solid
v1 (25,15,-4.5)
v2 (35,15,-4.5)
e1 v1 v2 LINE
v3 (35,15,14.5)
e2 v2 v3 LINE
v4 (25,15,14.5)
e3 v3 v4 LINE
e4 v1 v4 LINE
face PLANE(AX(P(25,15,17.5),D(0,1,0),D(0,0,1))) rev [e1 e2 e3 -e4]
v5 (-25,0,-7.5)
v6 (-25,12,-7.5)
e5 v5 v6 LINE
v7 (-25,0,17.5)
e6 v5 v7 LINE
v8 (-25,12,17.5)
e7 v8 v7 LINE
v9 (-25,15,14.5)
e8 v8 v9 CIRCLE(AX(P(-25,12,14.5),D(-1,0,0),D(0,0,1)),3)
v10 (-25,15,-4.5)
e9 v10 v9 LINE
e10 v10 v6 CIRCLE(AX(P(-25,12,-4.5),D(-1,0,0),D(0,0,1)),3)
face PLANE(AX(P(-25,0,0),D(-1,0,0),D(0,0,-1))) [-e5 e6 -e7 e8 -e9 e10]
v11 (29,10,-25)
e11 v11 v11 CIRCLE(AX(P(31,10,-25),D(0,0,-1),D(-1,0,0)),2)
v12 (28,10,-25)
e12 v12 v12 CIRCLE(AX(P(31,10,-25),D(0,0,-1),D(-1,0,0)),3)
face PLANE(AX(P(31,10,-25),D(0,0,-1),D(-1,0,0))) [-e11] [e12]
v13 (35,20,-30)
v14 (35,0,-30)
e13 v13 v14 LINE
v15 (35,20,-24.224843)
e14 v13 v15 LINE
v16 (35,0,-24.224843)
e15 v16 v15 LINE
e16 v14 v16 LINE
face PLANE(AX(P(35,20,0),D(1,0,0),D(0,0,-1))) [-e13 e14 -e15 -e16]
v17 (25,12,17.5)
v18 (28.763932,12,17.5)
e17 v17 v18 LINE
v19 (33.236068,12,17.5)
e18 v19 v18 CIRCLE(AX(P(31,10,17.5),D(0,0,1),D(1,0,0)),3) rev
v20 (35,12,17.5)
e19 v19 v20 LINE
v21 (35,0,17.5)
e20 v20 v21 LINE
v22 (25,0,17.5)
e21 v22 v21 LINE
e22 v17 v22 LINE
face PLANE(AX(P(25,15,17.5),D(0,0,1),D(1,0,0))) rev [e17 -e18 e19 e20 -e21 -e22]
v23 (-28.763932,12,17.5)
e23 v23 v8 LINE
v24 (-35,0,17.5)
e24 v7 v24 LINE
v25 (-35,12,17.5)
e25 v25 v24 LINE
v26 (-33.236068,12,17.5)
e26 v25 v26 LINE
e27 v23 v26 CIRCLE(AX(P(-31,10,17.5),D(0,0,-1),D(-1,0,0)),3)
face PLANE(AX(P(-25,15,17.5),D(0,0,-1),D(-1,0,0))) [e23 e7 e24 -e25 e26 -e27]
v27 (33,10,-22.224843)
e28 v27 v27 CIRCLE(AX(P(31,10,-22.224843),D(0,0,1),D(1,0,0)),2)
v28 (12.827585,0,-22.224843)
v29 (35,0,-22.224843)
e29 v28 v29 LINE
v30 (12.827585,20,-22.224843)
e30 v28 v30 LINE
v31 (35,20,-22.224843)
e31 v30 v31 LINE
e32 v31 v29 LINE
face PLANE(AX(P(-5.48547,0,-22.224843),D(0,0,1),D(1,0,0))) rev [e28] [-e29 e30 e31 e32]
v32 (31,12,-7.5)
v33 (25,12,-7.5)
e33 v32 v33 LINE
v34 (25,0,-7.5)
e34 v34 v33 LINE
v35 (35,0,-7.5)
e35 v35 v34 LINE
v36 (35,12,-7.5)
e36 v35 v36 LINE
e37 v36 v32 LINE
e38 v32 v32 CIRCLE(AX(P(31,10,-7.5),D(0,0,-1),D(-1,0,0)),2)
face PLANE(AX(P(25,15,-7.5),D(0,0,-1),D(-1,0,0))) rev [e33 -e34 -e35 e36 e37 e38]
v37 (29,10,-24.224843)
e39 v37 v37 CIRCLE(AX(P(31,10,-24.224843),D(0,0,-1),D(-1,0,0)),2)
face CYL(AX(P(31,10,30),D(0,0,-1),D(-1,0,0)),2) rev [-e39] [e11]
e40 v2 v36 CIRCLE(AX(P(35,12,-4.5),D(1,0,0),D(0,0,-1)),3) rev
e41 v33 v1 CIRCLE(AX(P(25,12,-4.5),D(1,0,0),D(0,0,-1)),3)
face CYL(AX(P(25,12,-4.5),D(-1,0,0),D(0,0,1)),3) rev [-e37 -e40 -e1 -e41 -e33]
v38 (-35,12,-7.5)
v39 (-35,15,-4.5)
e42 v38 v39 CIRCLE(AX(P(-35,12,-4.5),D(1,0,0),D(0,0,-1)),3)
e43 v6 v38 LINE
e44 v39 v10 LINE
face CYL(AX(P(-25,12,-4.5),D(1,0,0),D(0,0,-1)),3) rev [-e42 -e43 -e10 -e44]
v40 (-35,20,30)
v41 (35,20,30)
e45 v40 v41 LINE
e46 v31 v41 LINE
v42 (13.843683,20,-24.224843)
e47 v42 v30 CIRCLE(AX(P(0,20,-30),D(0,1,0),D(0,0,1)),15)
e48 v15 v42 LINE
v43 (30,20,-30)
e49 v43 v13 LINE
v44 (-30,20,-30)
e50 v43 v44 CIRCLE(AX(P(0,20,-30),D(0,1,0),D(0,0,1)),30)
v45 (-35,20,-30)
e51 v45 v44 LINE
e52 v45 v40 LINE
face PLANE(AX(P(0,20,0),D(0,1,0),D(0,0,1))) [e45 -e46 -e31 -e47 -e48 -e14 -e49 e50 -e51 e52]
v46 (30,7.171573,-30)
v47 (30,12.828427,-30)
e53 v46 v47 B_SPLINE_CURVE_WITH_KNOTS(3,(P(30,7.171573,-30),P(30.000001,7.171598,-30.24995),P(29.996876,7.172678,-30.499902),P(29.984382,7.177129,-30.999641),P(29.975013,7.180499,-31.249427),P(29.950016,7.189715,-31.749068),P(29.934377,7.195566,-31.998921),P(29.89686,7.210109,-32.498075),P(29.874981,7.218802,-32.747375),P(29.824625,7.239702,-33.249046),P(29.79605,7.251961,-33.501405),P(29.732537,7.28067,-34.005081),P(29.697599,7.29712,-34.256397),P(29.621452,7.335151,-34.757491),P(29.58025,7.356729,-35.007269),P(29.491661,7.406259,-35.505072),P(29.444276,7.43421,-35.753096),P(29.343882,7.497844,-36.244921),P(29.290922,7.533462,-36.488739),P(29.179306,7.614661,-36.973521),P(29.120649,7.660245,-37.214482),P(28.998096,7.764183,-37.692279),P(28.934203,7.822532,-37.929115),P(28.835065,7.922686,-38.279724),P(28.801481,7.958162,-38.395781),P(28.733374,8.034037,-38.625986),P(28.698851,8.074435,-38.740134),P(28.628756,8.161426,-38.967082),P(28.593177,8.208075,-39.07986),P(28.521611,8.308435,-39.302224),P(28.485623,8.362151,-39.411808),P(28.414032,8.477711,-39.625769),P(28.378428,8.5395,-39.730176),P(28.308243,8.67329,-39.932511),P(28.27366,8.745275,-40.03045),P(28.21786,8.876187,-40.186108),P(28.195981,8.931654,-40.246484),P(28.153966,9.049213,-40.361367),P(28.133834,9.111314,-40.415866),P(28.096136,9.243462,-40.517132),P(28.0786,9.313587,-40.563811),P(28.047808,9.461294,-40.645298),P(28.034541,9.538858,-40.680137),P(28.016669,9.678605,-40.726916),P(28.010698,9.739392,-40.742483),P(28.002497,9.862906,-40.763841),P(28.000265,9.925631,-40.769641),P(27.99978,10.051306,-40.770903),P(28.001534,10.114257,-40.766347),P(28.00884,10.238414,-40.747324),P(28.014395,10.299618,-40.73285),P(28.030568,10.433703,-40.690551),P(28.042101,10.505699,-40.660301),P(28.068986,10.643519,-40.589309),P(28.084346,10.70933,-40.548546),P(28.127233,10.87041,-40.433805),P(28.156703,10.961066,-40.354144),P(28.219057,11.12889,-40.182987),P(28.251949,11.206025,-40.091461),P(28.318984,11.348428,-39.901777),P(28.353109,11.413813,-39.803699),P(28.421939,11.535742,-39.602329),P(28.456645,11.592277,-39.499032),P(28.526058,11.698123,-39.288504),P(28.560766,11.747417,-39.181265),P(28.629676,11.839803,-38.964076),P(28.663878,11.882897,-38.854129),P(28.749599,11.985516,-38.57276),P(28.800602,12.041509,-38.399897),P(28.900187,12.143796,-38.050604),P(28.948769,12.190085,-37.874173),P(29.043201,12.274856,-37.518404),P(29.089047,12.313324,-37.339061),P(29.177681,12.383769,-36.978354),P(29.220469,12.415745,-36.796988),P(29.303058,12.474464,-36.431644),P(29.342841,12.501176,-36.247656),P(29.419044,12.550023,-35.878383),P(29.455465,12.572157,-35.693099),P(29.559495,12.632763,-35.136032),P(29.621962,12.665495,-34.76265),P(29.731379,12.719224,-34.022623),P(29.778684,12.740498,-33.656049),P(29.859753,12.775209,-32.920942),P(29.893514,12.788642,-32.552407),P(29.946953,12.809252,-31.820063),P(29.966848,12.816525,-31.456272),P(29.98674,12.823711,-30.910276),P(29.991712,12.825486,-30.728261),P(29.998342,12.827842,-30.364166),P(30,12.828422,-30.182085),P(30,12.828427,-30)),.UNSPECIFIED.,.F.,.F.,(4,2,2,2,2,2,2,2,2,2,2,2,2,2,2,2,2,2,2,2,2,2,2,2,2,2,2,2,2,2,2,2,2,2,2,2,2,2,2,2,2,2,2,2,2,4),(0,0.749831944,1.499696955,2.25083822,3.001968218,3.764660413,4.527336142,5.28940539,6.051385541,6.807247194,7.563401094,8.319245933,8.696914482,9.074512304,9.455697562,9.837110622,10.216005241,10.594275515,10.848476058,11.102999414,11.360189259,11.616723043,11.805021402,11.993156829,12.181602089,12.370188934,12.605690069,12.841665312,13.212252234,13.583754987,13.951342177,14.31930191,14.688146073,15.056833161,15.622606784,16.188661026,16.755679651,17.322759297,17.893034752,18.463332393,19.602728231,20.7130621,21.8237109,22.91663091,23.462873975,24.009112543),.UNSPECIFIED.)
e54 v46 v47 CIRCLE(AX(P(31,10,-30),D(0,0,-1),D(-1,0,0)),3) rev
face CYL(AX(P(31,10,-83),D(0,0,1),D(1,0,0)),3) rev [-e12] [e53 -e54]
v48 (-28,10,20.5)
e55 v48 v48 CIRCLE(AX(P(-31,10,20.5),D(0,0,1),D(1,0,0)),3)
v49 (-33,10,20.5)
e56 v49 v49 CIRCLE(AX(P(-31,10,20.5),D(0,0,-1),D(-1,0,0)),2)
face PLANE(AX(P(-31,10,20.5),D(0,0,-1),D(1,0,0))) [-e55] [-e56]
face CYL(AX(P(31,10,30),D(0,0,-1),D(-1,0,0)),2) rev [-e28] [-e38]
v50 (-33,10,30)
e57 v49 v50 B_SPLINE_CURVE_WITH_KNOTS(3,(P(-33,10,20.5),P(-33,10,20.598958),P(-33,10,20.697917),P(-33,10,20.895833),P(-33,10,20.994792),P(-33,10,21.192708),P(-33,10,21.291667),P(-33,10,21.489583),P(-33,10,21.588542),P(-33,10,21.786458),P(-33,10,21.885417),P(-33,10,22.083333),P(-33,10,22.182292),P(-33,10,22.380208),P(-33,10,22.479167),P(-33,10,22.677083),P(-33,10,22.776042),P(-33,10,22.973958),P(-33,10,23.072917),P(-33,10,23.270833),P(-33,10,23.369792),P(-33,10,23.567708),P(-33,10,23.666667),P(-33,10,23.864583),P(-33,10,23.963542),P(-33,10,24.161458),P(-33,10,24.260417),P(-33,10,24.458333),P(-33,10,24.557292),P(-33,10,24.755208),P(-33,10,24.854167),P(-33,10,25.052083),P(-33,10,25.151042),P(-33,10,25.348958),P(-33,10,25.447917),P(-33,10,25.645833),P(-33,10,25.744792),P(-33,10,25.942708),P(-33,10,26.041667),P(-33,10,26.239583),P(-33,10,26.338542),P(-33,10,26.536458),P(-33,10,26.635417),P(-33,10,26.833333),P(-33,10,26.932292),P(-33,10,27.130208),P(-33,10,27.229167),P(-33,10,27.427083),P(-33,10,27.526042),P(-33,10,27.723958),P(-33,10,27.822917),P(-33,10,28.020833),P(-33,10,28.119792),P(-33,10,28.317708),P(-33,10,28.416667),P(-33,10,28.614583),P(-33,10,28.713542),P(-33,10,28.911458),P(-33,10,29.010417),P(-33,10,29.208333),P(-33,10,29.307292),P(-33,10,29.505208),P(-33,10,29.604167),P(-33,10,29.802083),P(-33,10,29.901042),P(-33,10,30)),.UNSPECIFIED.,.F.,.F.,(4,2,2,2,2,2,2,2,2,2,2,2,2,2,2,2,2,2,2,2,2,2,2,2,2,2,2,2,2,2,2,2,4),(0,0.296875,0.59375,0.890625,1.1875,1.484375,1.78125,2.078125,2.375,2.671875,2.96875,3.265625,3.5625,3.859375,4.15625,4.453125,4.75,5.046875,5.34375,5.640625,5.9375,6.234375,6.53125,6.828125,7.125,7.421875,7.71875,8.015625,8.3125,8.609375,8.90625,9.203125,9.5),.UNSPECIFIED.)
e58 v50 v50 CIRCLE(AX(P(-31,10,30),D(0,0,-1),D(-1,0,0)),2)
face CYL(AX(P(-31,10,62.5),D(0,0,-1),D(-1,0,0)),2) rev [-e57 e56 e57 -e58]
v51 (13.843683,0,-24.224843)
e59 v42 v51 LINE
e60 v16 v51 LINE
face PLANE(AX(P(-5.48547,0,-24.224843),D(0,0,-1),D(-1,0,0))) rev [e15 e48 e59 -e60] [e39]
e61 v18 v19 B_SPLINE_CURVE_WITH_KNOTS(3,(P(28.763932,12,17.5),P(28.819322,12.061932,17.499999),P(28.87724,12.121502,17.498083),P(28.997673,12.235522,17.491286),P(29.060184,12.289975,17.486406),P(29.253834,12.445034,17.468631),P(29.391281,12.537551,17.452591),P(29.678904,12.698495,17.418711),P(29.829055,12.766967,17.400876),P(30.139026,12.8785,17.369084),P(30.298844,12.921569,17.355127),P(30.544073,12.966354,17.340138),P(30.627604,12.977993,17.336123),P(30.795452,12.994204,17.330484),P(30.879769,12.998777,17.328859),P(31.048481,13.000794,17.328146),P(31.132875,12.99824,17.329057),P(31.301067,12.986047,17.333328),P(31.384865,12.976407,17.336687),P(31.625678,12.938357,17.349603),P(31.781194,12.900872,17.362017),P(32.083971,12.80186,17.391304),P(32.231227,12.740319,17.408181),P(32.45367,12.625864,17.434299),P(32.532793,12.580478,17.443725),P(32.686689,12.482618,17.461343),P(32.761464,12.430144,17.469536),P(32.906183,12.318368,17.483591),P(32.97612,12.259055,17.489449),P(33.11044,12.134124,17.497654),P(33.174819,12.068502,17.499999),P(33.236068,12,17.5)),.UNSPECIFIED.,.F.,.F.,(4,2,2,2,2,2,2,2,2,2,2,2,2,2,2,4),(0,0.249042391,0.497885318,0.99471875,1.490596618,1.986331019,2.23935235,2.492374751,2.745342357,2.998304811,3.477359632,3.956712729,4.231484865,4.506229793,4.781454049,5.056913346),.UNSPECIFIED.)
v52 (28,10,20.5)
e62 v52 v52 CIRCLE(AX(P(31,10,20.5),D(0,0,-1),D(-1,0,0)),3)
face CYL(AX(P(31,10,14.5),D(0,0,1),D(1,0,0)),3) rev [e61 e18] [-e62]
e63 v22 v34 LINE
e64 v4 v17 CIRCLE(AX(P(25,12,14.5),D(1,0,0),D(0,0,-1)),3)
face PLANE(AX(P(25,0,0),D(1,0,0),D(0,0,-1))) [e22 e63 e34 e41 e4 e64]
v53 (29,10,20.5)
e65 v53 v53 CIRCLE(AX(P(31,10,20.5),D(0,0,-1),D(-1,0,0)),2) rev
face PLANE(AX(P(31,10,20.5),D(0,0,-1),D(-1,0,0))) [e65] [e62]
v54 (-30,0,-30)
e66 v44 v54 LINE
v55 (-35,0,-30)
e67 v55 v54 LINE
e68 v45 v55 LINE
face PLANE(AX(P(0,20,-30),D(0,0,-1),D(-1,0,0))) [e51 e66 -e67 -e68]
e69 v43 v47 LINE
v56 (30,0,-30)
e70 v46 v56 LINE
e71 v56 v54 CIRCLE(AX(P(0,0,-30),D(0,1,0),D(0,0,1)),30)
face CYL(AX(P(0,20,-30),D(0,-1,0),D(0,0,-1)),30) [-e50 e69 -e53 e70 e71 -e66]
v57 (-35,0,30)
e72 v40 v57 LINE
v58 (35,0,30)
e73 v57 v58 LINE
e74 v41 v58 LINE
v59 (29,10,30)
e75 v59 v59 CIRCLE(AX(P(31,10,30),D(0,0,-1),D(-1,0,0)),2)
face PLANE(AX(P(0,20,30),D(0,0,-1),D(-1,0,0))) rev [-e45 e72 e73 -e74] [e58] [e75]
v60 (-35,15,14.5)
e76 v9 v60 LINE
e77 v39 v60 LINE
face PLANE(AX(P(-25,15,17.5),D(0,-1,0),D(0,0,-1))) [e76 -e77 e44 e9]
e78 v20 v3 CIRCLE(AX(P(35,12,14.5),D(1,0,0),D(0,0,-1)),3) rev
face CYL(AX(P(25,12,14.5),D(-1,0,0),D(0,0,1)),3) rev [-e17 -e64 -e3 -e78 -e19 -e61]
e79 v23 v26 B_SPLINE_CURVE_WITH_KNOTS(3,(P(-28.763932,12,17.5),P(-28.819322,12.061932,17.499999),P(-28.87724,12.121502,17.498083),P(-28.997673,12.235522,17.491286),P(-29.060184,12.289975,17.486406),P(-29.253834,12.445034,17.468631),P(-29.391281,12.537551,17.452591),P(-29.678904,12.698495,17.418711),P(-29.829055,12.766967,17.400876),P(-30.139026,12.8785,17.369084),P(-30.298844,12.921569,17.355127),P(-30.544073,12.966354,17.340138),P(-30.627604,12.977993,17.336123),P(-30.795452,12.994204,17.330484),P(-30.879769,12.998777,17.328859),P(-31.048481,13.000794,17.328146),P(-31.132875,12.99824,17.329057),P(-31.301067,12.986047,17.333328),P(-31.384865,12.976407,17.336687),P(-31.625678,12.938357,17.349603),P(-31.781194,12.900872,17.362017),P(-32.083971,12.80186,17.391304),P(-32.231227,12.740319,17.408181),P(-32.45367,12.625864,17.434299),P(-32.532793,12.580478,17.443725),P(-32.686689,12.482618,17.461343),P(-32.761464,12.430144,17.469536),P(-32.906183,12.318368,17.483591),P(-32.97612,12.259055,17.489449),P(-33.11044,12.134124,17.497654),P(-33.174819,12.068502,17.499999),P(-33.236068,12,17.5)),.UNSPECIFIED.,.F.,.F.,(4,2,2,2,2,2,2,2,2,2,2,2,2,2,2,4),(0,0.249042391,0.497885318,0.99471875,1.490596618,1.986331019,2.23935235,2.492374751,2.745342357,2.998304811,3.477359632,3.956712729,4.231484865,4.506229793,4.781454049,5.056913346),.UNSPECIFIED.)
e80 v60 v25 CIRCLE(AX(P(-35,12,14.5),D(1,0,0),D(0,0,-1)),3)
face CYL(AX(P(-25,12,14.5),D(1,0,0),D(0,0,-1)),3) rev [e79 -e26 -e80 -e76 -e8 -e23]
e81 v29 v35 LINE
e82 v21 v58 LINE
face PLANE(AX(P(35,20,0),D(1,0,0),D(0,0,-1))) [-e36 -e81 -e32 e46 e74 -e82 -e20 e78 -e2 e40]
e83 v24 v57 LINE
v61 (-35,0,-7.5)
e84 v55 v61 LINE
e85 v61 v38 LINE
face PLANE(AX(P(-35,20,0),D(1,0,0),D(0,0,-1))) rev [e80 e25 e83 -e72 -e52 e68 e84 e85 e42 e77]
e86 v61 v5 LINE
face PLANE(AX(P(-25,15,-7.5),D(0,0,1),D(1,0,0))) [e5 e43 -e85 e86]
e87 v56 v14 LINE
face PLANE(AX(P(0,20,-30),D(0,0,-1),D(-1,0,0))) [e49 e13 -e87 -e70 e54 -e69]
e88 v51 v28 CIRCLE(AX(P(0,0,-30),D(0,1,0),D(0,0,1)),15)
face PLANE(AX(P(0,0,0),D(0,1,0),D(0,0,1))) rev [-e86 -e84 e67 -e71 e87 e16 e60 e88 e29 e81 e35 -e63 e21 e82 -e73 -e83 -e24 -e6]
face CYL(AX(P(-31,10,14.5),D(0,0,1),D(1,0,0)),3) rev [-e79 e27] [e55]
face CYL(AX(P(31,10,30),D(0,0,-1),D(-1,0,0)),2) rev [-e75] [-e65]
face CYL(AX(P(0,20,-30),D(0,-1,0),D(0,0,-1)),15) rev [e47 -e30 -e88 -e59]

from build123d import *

# Parameters (mm, degrees)
SKETCH_1_R               = 15
EXTRUDE_1_DEPTH          = 20
SKETCH_2_W               = 80.970939558
SKETCH_2_H               = 2
CUT_EXTRUDE_1_DEPTH      = 73.284161474
SKETCH_3_W               = 25
SKETCH_3_H               = 30
CUT_EXTRUDE_2_DEPTH      = 10
FILLET_1_R               = 3
CUT_EXTRUDE_3_DEPTH      = 53
CUT_EXTRUDE_3_DEPTH_BACK = 5
SKETCH_4_R               = 3
SKETCH_5_R               = 2
CUT_EXTRUDE_4_DEPTH      = 69.190908514
SKETCH_6_R               = 3
CUT_EXTRUDE_5_DEPTH      = 3
MIRROR_START             = -35
MIRROR_1_DEPTH           = 10
MIRROR_START_2           = 17.3284275
MIRROR_1_2_OUTLINE_R     = 3
MIRROR_1_2_DEPTH         = 3.1715725
SKETCH_7_R               = 2
CUT_EXTRUDE_6_DEPTH      = 42


with BuildPart() as part:
    # 草图1 → 凸台-拉伸1 (new body)
    with BuildSketch(Plane(origin=(0, 0, 0), x_dir=(1, 0, 0), z_dir=(0, 1, 0))):
        with BuildLine():
            Line((-30, 30), (-35, 30))
            Line((-35, 30), (-35, -30))
            Line((-35, -30), (35, -30))
            Line((35, -30), (35, 30))
            Line((35, 30), (30, 30))
            ThreePointArc((30, 30), (0, 60), (-30, 30))
        make_face()
        with Locations(Location((0, 30, 0), (0, 0, 270))):
            Circle(SKETCH_1_R, mode=Mode.SUBTRACT)
    extrude(amount=EXTRUDE_1_DEPTH)

    # 草图2 → 切除-拉伸1 (cut, through all)
    with BuildSketch(Plane(origin=(0, 20, 0), x_dir=(1, 0, 0), z_dir=(0, 1, 0))):
        with Locations((35, 23.224842932)):
            Rectangle(SKETCH_2_W, SKETCH_2_H)
    extrude(amount=-CUT_EXTRUDE_1_DEPTH, mode=Mode.SUBTRACT)

    # 草图3 → 切除-拉伸2 (cut)
    with BuildSketch(Plane(origin=(35, 0, 0), x_dir=(0, 0, -1), z_dir=(1, 0, 0))):
        with Locations((-5, 0)):
            Rectangle(SKETCH_3_W, SKETCH_3_H)
    extrude(amount=-CUT_EXTRUDE_2_DEPTH, mode=Mode.SUBTRACT)

    # 圆角1
    fillet_1_edges = [part.edges().sort_by_distance(p)[0] for p in [
        (30, 15, -7.5),
        (30, 15, 17.5),
    ]]
    fillet(fillet_1_edges, radius=FILLET_1_R)

    # 草图4 → 切除-拉伸3 (cut, two sides: drawn at the far end of the back side and taken through both)
    with BuildSketch(Plane(origin=(0, 0, -30), x_dir=(-1, 0, 0), z_dir=(0, 0, -1)).offset(-CUT_EXTRUDE_3_DEPTH_BACK)):
        with Locations(Location((-31, 10, 0), (0, 0, 70.528779366))):
            Circle(SKETCH_4_R)
    extrude(amount=CUT_EXTRUDE_3_DEPTH + CUT_EXTRUDE_3_DEPTH_BACK, mode=Mode.SUBTRACT)

    # 草图5 → 切除-拉伸4 (cut, through all)
    with BuildSketch(Plane(origin=(0, 0, -25), x_dir=(-1, 0, 0), z_dir=(0, 0, -1))):
        with Locations((-31, 10)):
            Circle(SKETCH_5_R)
    extrude(amount=-CUT_EXTRUDE_4_DEPTH, mode=Mode.SUBTRACT)

    # 草图6 → 切除-拉伸5 (cut, symmetric)
    with BuildSketch(Plane(origin=(0, 0, 17.5), x_dir=(-1, 0, 0), z_dir=(0, 0, -1))):
        with Locations(Location((-31, 10, 0), (0, 0, 70.528779366))):
            Circle(SKETCH_6_R)
    extrude(amount=CUT_EXTRUDE_5_DEPTH, both=True, mode=Mode.SUBTRACT)

    # 镜向1: read off the stored shape, not the designer's step
    # 镜向1 outline → 镜向1 (cut)
    with BuildSketch(Plane.YZ.offset(MIRROR_START)):
        with BuildLine():
            Line((12, 17.5), (0, 17.5))
            Line((0, 17.5), (0, -7.5))
            Line((0, -7.5), (12, -7.5))
            ThreePointArc((12, -7.5), (14.121320344, -6.621320344), (15, -4.5))
            Line((15, -4.5), (15, 14.5))
            ThreePointArc((15, 14.5), (14.121320344, 16.621320344), (12, 17.5))
        make_face()
    extrude(amount=MIRROR_1_DEPTH, mode=Mode.SUBTRACT)

    # Mirror 1 2 outline → Mirror 1 2 (cut)
    with BuildSketch(Plane.XY.offset(MIRROR_START_2)):
        with Locations((-31, 10)):
            Circle(MIRROR_1_2_OUTLINE_R)
    extrude(amount=MIRROR_1_2_DEPTH, mode=Mode.SUBTRACT)

    # 草图7 → 切除-拉伸6 (cut)
    with BuildSketch(Plane(origin=(0, 0, 20.5), x_dir=(-1, 0, 0), z_dir=(0, 0, -1))):
        with Locations((31, 10)):
            Circle(SKETCH_7_R)
    extrude(amount=-CUT_EXTRUDE_6_DEPTH, mode=Mode.SUBTRACT)


solid = part.part
